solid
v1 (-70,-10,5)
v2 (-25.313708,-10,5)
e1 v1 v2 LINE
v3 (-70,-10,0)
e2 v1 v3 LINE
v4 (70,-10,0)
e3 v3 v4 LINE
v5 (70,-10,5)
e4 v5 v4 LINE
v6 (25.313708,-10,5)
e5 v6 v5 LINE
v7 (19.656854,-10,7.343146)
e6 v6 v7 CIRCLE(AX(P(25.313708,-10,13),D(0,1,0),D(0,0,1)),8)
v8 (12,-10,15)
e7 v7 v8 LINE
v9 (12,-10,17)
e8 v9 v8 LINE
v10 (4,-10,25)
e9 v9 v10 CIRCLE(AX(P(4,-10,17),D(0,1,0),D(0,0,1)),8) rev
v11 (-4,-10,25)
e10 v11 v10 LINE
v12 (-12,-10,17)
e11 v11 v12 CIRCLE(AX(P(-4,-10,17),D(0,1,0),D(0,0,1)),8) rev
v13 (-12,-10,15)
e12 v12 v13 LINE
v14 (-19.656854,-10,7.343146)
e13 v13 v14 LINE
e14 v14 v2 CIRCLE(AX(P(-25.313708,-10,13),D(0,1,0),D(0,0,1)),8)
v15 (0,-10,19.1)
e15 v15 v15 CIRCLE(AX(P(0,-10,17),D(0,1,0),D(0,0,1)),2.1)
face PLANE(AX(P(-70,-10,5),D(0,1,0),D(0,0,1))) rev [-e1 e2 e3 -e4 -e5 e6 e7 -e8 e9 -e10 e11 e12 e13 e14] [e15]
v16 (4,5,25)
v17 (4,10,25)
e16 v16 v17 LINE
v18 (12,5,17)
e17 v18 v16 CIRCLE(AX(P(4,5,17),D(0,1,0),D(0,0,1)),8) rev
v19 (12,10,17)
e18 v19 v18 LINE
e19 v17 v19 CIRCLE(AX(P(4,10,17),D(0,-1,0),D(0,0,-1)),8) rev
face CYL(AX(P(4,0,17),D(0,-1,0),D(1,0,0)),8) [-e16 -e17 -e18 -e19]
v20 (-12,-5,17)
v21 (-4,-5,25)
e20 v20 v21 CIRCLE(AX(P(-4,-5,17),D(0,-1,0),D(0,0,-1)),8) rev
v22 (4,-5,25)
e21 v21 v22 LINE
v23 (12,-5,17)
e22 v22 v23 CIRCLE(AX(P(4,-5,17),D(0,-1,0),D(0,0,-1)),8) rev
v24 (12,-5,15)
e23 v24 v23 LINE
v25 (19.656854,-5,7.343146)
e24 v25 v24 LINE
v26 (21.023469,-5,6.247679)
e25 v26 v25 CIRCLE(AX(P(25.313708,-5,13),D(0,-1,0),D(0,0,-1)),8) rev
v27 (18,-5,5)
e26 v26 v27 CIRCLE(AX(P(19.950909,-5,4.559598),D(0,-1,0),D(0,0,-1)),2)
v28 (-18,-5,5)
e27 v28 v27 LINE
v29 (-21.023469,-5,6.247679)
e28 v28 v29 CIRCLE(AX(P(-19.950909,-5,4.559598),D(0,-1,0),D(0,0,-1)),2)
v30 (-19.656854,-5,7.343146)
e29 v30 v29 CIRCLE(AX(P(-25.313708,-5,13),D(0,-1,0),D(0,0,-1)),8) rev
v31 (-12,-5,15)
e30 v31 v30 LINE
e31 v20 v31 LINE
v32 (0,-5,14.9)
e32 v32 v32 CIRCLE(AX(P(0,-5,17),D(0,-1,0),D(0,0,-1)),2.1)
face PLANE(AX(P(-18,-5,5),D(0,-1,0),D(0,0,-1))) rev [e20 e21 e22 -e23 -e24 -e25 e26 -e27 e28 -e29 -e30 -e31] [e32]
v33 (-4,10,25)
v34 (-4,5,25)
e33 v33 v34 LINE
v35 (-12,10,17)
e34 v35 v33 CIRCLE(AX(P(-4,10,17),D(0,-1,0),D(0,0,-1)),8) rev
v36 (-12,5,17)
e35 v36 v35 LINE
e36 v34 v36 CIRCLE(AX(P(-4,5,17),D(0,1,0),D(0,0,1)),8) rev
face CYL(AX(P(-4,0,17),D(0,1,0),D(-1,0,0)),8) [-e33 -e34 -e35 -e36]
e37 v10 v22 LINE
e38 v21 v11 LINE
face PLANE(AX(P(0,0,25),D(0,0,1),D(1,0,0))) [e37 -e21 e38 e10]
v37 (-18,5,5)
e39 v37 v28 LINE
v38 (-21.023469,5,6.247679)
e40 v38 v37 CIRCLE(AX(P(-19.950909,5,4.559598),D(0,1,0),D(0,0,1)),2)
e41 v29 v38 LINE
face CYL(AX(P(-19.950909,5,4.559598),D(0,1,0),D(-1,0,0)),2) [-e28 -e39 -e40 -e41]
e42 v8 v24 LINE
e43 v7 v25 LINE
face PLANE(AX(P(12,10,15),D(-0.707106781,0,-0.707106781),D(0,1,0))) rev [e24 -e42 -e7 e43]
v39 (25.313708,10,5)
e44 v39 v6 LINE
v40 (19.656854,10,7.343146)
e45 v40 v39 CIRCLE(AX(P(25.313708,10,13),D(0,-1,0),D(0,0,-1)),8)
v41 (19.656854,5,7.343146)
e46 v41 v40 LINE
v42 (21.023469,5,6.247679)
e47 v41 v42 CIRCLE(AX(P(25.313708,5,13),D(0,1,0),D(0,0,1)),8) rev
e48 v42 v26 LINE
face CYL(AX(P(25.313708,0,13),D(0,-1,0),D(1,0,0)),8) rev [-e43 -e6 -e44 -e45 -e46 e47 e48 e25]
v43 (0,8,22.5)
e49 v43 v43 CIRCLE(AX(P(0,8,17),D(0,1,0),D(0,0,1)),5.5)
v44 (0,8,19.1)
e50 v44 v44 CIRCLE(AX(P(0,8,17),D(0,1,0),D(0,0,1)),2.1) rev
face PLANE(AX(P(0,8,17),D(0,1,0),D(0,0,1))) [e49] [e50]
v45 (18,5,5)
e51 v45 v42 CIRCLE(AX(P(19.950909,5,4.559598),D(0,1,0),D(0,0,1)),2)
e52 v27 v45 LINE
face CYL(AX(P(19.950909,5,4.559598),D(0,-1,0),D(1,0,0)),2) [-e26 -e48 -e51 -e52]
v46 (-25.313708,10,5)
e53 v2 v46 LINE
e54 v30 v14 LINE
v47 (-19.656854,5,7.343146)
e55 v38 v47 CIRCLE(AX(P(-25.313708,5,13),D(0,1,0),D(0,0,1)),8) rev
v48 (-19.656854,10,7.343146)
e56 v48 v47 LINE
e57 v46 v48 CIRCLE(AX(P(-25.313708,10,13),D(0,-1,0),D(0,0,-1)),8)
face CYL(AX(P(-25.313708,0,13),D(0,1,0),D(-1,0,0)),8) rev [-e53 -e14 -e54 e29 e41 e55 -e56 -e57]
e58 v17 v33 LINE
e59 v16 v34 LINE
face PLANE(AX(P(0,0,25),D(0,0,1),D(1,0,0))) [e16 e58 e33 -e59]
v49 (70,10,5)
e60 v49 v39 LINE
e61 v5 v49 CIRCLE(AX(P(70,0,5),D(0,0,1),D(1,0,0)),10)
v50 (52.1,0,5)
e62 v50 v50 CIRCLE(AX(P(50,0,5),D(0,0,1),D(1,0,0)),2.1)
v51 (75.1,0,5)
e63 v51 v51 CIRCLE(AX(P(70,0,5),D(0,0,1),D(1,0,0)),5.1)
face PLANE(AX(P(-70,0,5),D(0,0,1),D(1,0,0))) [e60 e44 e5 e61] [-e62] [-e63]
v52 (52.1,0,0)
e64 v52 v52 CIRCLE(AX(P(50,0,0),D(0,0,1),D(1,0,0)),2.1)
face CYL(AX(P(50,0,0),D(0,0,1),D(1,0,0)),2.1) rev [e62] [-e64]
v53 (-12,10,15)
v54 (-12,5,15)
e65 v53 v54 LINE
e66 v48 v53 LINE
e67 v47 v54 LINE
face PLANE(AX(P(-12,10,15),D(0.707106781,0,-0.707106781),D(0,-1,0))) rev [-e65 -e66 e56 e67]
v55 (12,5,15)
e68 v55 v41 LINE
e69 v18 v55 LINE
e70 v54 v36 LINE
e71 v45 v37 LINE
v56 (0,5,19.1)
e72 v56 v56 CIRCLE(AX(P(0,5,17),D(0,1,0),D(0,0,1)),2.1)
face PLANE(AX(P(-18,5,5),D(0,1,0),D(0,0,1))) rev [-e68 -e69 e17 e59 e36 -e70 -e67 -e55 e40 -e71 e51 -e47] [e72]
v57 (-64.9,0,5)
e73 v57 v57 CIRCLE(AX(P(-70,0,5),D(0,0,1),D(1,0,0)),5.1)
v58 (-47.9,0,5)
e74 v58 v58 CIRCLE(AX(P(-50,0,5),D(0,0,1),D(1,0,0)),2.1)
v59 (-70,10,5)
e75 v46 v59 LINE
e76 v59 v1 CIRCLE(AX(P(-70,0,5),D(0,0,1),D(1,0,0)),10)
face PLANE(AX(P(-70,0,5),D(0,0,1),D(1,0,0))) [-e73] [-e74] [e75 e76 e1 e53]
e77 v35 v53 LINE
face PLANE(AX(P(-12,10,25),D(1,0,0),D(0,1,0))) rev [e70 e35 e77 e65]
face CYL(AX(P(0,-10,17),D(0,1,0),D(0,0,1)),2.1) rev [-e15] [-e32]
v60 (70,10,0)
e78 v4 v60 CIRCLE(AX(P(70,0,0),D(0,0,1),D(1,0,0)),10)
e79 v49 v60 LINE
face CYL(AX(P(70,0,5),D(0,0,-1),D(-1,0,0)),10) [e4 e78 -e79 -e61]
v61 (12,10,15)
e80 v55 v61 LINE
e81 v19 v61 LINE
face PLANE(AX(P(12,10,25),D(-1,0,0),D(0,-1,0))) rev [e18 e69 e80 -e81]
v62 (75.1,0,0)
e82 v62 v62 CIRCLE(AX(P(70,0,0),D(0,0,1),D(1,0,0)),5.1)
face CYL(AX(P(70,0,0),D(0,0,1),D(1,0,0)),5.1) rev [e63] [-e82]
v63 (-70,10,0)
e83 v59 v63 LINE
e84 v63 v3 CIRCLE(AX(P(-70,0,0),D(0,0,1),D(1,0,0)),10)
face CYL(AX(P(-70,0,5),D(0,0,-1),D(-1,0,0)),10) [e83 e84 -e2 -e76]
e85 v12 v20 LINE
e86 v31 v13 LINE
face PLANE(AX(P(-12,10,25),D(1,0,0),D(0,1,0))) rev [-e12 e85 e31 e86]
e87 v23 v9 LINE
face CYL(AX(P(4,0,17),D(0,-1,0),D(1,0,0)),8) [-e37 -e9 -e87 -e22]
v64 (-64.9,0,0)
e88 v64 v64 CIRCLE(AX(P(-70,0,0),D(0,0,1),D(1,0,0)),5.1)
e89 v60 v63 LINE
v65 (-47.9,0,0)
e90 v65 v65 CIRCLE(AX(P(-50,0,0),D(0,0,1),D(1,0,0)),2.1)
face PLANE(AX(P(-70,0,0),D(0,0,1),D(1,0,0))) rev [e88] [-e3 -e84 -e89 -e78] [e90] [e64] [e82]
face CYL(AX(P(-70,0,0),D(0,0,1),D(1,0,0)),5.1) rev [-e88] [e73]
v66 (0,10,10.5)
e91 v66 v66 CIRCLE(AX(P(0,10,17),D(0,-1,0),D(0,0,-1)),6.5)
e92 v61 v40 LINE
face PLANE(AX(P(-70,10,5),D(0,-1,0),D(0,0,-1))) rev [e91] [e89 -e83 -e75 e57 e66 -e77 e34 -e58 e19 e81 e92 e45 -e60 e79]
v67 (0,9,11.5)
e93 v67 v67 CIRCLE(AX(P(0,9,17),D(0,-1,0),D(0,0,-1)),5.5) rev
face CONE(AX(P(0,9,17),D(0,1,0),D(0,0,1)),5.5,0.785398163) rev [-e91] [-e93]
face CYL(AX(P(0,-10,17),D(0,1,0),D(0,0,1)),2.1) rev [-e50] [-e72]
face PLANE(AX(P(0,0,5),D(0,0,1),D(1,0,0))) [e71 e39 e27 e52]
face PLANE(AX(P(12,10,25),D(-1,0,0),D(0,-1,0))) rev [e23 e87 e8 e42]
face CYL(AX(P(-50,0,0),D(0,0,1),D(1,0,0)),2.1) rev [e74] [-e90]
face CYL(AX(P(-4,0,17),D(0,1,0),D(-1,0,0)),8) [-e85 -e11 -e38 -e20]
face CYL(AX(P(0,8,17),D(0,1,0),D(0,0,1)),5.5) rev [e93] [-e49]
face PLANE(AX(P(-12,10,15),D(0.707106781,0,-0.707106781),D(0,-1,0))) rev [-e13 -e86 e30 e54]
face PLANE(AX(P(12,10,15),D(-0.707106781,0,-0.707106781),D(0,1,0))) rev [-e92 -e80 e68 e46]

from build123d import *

# Parameters (mm, degrees)
BOSS_EXTRU_1_DEPTH      = 5
ESQUISSE2_R             = 5.1
ESQUISSE2_R_2           = 2.1
ENL_V_MAT_EXTRU_1_DEPTH = 81.777472107
ESQUISSE3_W             = 24
ESQUISSE3_H             = 20
BOSS_EXTRU_2_DEPTH      = 20
CHANFREIN1_SIZE         = 10
ESQUISSE4_W             = 36
ESQUISSE4_H             = 10
ENL_V_MAT_EXTRU_2_DEPTH = 20
ESQUISSE5_R             = 2.1
ENL_V_MAT_EXTRU_3_DEPTH = 87.168439698
CONG_1_R                = 8
ESQUISSE6_R             = 5.5
ENL_V_MAT_EXTRU_4_DEPTH = 2
CHANFREIN2_SIZE         = 1
CONG_4_R                = 2


with BuildPart() as part:
    # Esquisse1 → Boss.-Extru.1 (new body)
    with BuildSketch(Plane.XY):
        with BuildLine():
            Line((-70, 10), (70, 10))
            ThreePointArc((70, 10), (80, 0), (70, -10))
            Line((70, -10), (-70, -10))
            ThreePointArc((-70, -10), (-80, 0), (-70, 10))
        make_face()
    extrude(amount=BOSS_EXTRU_1_DEPTH)

    # Esquisse2 → Enlèv. mat.-Extru.1 (cut, through all)
    with BuildSketch(Plane.XY.offset(5)):
        with Locations((-70, 0)):
            Circle(ESQUISSE2_R)
        with Locations((70, 0)):
            Circle(ESQUISSE2_R)
        with Locations((-50, 0)):
            Circle(ESQUISSE2_R_2)
        with Locations((50, 0)):
            Circle(ESQUISSE2_R_2)
    extrude(amount=-ENL_V_MAT_EXTRU_1_DEPTH, mode=Mode.SUBTRACT)

    # Esquisse3 → Boss.-Extru.2 (add)
    with BuildSketch(Plane.XY.offset(5)):
        Rectangle(ESQUISSE3_W, ESQUISSE3_H)
    extrude(amount=BOSS_EXTRU_2_DEPTH)

    # Chanfrein1
    chanfrein1_edges = [part.edges().sort_by_distance(p)[0] for p in [
        (12, 0, 5),
        (-12, 0, 5),
    ]]
    chamfer(chanfrein1_edges, length=CHANFREIN1_SIZE)

    # Esquisse4 → Enlèv. mat.-Extru.2 (cut)
    with BuildSketch(Plane.XY.offset(25)):
        Rectangle(ESQUISSE4_W, ESQUISSE4_H)
    extrude(amount=-ENL_V_MAT_EXTRU_2_DEPTH, mode=Mode.SUBTRACT)

    # Esquisse5 → Enlèv. mat.-Extru.3 (cut, through all)
    with BuildSketch(Plane(origin=(0, 10, 0), x_dir=(1, 0, 0), z_dir=(0, 1, 0))):
        with Locations(Location((0, -17, 0), (0, 0, 270))):
            Circle(ESQUISSE5_R)
    extrude(amount=-ENL_V_MAT_EXTRU_3_DEPTH, mode=Mode.SUBTRACT)

    # Congé1
    cong_1_edges = [part.edges().sort_by_distance(p)[0] for p in [
        (-22, 0, 5),
        (-12, -7.5, 25),
        (12, -7.5, 25),
        (22, 0, 5),
        (-12, 7.5, 25),
        (12, 7.5, 25),
    ]]
    fillet(cong_1_edges, radius=CONG_1_R)

    # Esquisse6 → Enlèv. mat.-Extru.4 (cut)
    with BuildSketch(Plane(origin=(0, 10, 0), x_dir=(1, 0, 0), z_dir=(0, 1, 0))):
        with Locations(Location((0, -17, 0), (0, 0, 270))):
            Circle(ESQUISSE6_R)
    extrude(amount=-ENL_V_MAT_EXTRU_4_DEPTH, mode=Mode.SUBTRACT)

    # Chanfrein2
    chanfrein2_edges = [part.edges().sort_by_distance(p)[0] for p in [
        (0, 10, 11.5),
    ]]
    chamfer(chanfrein2_edges, length=CHANFREIN2_SIZE)

    # Congé4
    # the kernel refuses this fillet: 2 mm, written as the material it takes off along each edge
    with BuildSketch(Plane(origin=(18, -5, 9), x_dir=(0.7394878589424565, 0, -0.6731698942144558), z_dir=(0, 1, 0)), Plane(origin=(-18, 5, 9), x_dir=(-0.7394878589424565, 0, -0.6731698942144557), z_dir=(0, -1, 0))) as cong_4_piece_1:
        with BuildLine():
            CenterArc((4.431818389, 1.970329953), CONG_4_R, 150.40864019, 109.709922664)
            Line((2.692679577, 2.957951436), (2.518765696, 3.056713584))
            ThreePointArc((2.518765696, 3.056713584), (1.198442217, 1.613609697), (-0.147897572, 0.134633979))
            Line((-0.147897572, 0.134633979), (0.009378777, -0.199779975))
            ThreePointArc((0.009378777, -0.199779975), (2.349946778, -0.089900774), (4.054276537, -0.197032995))
            Line((4.054276537, -0.197032995), (4.088598523, 0))
        make_face()
    extrude(amount=10, mode=Mode.SUBTRACT)


solid = part.part
